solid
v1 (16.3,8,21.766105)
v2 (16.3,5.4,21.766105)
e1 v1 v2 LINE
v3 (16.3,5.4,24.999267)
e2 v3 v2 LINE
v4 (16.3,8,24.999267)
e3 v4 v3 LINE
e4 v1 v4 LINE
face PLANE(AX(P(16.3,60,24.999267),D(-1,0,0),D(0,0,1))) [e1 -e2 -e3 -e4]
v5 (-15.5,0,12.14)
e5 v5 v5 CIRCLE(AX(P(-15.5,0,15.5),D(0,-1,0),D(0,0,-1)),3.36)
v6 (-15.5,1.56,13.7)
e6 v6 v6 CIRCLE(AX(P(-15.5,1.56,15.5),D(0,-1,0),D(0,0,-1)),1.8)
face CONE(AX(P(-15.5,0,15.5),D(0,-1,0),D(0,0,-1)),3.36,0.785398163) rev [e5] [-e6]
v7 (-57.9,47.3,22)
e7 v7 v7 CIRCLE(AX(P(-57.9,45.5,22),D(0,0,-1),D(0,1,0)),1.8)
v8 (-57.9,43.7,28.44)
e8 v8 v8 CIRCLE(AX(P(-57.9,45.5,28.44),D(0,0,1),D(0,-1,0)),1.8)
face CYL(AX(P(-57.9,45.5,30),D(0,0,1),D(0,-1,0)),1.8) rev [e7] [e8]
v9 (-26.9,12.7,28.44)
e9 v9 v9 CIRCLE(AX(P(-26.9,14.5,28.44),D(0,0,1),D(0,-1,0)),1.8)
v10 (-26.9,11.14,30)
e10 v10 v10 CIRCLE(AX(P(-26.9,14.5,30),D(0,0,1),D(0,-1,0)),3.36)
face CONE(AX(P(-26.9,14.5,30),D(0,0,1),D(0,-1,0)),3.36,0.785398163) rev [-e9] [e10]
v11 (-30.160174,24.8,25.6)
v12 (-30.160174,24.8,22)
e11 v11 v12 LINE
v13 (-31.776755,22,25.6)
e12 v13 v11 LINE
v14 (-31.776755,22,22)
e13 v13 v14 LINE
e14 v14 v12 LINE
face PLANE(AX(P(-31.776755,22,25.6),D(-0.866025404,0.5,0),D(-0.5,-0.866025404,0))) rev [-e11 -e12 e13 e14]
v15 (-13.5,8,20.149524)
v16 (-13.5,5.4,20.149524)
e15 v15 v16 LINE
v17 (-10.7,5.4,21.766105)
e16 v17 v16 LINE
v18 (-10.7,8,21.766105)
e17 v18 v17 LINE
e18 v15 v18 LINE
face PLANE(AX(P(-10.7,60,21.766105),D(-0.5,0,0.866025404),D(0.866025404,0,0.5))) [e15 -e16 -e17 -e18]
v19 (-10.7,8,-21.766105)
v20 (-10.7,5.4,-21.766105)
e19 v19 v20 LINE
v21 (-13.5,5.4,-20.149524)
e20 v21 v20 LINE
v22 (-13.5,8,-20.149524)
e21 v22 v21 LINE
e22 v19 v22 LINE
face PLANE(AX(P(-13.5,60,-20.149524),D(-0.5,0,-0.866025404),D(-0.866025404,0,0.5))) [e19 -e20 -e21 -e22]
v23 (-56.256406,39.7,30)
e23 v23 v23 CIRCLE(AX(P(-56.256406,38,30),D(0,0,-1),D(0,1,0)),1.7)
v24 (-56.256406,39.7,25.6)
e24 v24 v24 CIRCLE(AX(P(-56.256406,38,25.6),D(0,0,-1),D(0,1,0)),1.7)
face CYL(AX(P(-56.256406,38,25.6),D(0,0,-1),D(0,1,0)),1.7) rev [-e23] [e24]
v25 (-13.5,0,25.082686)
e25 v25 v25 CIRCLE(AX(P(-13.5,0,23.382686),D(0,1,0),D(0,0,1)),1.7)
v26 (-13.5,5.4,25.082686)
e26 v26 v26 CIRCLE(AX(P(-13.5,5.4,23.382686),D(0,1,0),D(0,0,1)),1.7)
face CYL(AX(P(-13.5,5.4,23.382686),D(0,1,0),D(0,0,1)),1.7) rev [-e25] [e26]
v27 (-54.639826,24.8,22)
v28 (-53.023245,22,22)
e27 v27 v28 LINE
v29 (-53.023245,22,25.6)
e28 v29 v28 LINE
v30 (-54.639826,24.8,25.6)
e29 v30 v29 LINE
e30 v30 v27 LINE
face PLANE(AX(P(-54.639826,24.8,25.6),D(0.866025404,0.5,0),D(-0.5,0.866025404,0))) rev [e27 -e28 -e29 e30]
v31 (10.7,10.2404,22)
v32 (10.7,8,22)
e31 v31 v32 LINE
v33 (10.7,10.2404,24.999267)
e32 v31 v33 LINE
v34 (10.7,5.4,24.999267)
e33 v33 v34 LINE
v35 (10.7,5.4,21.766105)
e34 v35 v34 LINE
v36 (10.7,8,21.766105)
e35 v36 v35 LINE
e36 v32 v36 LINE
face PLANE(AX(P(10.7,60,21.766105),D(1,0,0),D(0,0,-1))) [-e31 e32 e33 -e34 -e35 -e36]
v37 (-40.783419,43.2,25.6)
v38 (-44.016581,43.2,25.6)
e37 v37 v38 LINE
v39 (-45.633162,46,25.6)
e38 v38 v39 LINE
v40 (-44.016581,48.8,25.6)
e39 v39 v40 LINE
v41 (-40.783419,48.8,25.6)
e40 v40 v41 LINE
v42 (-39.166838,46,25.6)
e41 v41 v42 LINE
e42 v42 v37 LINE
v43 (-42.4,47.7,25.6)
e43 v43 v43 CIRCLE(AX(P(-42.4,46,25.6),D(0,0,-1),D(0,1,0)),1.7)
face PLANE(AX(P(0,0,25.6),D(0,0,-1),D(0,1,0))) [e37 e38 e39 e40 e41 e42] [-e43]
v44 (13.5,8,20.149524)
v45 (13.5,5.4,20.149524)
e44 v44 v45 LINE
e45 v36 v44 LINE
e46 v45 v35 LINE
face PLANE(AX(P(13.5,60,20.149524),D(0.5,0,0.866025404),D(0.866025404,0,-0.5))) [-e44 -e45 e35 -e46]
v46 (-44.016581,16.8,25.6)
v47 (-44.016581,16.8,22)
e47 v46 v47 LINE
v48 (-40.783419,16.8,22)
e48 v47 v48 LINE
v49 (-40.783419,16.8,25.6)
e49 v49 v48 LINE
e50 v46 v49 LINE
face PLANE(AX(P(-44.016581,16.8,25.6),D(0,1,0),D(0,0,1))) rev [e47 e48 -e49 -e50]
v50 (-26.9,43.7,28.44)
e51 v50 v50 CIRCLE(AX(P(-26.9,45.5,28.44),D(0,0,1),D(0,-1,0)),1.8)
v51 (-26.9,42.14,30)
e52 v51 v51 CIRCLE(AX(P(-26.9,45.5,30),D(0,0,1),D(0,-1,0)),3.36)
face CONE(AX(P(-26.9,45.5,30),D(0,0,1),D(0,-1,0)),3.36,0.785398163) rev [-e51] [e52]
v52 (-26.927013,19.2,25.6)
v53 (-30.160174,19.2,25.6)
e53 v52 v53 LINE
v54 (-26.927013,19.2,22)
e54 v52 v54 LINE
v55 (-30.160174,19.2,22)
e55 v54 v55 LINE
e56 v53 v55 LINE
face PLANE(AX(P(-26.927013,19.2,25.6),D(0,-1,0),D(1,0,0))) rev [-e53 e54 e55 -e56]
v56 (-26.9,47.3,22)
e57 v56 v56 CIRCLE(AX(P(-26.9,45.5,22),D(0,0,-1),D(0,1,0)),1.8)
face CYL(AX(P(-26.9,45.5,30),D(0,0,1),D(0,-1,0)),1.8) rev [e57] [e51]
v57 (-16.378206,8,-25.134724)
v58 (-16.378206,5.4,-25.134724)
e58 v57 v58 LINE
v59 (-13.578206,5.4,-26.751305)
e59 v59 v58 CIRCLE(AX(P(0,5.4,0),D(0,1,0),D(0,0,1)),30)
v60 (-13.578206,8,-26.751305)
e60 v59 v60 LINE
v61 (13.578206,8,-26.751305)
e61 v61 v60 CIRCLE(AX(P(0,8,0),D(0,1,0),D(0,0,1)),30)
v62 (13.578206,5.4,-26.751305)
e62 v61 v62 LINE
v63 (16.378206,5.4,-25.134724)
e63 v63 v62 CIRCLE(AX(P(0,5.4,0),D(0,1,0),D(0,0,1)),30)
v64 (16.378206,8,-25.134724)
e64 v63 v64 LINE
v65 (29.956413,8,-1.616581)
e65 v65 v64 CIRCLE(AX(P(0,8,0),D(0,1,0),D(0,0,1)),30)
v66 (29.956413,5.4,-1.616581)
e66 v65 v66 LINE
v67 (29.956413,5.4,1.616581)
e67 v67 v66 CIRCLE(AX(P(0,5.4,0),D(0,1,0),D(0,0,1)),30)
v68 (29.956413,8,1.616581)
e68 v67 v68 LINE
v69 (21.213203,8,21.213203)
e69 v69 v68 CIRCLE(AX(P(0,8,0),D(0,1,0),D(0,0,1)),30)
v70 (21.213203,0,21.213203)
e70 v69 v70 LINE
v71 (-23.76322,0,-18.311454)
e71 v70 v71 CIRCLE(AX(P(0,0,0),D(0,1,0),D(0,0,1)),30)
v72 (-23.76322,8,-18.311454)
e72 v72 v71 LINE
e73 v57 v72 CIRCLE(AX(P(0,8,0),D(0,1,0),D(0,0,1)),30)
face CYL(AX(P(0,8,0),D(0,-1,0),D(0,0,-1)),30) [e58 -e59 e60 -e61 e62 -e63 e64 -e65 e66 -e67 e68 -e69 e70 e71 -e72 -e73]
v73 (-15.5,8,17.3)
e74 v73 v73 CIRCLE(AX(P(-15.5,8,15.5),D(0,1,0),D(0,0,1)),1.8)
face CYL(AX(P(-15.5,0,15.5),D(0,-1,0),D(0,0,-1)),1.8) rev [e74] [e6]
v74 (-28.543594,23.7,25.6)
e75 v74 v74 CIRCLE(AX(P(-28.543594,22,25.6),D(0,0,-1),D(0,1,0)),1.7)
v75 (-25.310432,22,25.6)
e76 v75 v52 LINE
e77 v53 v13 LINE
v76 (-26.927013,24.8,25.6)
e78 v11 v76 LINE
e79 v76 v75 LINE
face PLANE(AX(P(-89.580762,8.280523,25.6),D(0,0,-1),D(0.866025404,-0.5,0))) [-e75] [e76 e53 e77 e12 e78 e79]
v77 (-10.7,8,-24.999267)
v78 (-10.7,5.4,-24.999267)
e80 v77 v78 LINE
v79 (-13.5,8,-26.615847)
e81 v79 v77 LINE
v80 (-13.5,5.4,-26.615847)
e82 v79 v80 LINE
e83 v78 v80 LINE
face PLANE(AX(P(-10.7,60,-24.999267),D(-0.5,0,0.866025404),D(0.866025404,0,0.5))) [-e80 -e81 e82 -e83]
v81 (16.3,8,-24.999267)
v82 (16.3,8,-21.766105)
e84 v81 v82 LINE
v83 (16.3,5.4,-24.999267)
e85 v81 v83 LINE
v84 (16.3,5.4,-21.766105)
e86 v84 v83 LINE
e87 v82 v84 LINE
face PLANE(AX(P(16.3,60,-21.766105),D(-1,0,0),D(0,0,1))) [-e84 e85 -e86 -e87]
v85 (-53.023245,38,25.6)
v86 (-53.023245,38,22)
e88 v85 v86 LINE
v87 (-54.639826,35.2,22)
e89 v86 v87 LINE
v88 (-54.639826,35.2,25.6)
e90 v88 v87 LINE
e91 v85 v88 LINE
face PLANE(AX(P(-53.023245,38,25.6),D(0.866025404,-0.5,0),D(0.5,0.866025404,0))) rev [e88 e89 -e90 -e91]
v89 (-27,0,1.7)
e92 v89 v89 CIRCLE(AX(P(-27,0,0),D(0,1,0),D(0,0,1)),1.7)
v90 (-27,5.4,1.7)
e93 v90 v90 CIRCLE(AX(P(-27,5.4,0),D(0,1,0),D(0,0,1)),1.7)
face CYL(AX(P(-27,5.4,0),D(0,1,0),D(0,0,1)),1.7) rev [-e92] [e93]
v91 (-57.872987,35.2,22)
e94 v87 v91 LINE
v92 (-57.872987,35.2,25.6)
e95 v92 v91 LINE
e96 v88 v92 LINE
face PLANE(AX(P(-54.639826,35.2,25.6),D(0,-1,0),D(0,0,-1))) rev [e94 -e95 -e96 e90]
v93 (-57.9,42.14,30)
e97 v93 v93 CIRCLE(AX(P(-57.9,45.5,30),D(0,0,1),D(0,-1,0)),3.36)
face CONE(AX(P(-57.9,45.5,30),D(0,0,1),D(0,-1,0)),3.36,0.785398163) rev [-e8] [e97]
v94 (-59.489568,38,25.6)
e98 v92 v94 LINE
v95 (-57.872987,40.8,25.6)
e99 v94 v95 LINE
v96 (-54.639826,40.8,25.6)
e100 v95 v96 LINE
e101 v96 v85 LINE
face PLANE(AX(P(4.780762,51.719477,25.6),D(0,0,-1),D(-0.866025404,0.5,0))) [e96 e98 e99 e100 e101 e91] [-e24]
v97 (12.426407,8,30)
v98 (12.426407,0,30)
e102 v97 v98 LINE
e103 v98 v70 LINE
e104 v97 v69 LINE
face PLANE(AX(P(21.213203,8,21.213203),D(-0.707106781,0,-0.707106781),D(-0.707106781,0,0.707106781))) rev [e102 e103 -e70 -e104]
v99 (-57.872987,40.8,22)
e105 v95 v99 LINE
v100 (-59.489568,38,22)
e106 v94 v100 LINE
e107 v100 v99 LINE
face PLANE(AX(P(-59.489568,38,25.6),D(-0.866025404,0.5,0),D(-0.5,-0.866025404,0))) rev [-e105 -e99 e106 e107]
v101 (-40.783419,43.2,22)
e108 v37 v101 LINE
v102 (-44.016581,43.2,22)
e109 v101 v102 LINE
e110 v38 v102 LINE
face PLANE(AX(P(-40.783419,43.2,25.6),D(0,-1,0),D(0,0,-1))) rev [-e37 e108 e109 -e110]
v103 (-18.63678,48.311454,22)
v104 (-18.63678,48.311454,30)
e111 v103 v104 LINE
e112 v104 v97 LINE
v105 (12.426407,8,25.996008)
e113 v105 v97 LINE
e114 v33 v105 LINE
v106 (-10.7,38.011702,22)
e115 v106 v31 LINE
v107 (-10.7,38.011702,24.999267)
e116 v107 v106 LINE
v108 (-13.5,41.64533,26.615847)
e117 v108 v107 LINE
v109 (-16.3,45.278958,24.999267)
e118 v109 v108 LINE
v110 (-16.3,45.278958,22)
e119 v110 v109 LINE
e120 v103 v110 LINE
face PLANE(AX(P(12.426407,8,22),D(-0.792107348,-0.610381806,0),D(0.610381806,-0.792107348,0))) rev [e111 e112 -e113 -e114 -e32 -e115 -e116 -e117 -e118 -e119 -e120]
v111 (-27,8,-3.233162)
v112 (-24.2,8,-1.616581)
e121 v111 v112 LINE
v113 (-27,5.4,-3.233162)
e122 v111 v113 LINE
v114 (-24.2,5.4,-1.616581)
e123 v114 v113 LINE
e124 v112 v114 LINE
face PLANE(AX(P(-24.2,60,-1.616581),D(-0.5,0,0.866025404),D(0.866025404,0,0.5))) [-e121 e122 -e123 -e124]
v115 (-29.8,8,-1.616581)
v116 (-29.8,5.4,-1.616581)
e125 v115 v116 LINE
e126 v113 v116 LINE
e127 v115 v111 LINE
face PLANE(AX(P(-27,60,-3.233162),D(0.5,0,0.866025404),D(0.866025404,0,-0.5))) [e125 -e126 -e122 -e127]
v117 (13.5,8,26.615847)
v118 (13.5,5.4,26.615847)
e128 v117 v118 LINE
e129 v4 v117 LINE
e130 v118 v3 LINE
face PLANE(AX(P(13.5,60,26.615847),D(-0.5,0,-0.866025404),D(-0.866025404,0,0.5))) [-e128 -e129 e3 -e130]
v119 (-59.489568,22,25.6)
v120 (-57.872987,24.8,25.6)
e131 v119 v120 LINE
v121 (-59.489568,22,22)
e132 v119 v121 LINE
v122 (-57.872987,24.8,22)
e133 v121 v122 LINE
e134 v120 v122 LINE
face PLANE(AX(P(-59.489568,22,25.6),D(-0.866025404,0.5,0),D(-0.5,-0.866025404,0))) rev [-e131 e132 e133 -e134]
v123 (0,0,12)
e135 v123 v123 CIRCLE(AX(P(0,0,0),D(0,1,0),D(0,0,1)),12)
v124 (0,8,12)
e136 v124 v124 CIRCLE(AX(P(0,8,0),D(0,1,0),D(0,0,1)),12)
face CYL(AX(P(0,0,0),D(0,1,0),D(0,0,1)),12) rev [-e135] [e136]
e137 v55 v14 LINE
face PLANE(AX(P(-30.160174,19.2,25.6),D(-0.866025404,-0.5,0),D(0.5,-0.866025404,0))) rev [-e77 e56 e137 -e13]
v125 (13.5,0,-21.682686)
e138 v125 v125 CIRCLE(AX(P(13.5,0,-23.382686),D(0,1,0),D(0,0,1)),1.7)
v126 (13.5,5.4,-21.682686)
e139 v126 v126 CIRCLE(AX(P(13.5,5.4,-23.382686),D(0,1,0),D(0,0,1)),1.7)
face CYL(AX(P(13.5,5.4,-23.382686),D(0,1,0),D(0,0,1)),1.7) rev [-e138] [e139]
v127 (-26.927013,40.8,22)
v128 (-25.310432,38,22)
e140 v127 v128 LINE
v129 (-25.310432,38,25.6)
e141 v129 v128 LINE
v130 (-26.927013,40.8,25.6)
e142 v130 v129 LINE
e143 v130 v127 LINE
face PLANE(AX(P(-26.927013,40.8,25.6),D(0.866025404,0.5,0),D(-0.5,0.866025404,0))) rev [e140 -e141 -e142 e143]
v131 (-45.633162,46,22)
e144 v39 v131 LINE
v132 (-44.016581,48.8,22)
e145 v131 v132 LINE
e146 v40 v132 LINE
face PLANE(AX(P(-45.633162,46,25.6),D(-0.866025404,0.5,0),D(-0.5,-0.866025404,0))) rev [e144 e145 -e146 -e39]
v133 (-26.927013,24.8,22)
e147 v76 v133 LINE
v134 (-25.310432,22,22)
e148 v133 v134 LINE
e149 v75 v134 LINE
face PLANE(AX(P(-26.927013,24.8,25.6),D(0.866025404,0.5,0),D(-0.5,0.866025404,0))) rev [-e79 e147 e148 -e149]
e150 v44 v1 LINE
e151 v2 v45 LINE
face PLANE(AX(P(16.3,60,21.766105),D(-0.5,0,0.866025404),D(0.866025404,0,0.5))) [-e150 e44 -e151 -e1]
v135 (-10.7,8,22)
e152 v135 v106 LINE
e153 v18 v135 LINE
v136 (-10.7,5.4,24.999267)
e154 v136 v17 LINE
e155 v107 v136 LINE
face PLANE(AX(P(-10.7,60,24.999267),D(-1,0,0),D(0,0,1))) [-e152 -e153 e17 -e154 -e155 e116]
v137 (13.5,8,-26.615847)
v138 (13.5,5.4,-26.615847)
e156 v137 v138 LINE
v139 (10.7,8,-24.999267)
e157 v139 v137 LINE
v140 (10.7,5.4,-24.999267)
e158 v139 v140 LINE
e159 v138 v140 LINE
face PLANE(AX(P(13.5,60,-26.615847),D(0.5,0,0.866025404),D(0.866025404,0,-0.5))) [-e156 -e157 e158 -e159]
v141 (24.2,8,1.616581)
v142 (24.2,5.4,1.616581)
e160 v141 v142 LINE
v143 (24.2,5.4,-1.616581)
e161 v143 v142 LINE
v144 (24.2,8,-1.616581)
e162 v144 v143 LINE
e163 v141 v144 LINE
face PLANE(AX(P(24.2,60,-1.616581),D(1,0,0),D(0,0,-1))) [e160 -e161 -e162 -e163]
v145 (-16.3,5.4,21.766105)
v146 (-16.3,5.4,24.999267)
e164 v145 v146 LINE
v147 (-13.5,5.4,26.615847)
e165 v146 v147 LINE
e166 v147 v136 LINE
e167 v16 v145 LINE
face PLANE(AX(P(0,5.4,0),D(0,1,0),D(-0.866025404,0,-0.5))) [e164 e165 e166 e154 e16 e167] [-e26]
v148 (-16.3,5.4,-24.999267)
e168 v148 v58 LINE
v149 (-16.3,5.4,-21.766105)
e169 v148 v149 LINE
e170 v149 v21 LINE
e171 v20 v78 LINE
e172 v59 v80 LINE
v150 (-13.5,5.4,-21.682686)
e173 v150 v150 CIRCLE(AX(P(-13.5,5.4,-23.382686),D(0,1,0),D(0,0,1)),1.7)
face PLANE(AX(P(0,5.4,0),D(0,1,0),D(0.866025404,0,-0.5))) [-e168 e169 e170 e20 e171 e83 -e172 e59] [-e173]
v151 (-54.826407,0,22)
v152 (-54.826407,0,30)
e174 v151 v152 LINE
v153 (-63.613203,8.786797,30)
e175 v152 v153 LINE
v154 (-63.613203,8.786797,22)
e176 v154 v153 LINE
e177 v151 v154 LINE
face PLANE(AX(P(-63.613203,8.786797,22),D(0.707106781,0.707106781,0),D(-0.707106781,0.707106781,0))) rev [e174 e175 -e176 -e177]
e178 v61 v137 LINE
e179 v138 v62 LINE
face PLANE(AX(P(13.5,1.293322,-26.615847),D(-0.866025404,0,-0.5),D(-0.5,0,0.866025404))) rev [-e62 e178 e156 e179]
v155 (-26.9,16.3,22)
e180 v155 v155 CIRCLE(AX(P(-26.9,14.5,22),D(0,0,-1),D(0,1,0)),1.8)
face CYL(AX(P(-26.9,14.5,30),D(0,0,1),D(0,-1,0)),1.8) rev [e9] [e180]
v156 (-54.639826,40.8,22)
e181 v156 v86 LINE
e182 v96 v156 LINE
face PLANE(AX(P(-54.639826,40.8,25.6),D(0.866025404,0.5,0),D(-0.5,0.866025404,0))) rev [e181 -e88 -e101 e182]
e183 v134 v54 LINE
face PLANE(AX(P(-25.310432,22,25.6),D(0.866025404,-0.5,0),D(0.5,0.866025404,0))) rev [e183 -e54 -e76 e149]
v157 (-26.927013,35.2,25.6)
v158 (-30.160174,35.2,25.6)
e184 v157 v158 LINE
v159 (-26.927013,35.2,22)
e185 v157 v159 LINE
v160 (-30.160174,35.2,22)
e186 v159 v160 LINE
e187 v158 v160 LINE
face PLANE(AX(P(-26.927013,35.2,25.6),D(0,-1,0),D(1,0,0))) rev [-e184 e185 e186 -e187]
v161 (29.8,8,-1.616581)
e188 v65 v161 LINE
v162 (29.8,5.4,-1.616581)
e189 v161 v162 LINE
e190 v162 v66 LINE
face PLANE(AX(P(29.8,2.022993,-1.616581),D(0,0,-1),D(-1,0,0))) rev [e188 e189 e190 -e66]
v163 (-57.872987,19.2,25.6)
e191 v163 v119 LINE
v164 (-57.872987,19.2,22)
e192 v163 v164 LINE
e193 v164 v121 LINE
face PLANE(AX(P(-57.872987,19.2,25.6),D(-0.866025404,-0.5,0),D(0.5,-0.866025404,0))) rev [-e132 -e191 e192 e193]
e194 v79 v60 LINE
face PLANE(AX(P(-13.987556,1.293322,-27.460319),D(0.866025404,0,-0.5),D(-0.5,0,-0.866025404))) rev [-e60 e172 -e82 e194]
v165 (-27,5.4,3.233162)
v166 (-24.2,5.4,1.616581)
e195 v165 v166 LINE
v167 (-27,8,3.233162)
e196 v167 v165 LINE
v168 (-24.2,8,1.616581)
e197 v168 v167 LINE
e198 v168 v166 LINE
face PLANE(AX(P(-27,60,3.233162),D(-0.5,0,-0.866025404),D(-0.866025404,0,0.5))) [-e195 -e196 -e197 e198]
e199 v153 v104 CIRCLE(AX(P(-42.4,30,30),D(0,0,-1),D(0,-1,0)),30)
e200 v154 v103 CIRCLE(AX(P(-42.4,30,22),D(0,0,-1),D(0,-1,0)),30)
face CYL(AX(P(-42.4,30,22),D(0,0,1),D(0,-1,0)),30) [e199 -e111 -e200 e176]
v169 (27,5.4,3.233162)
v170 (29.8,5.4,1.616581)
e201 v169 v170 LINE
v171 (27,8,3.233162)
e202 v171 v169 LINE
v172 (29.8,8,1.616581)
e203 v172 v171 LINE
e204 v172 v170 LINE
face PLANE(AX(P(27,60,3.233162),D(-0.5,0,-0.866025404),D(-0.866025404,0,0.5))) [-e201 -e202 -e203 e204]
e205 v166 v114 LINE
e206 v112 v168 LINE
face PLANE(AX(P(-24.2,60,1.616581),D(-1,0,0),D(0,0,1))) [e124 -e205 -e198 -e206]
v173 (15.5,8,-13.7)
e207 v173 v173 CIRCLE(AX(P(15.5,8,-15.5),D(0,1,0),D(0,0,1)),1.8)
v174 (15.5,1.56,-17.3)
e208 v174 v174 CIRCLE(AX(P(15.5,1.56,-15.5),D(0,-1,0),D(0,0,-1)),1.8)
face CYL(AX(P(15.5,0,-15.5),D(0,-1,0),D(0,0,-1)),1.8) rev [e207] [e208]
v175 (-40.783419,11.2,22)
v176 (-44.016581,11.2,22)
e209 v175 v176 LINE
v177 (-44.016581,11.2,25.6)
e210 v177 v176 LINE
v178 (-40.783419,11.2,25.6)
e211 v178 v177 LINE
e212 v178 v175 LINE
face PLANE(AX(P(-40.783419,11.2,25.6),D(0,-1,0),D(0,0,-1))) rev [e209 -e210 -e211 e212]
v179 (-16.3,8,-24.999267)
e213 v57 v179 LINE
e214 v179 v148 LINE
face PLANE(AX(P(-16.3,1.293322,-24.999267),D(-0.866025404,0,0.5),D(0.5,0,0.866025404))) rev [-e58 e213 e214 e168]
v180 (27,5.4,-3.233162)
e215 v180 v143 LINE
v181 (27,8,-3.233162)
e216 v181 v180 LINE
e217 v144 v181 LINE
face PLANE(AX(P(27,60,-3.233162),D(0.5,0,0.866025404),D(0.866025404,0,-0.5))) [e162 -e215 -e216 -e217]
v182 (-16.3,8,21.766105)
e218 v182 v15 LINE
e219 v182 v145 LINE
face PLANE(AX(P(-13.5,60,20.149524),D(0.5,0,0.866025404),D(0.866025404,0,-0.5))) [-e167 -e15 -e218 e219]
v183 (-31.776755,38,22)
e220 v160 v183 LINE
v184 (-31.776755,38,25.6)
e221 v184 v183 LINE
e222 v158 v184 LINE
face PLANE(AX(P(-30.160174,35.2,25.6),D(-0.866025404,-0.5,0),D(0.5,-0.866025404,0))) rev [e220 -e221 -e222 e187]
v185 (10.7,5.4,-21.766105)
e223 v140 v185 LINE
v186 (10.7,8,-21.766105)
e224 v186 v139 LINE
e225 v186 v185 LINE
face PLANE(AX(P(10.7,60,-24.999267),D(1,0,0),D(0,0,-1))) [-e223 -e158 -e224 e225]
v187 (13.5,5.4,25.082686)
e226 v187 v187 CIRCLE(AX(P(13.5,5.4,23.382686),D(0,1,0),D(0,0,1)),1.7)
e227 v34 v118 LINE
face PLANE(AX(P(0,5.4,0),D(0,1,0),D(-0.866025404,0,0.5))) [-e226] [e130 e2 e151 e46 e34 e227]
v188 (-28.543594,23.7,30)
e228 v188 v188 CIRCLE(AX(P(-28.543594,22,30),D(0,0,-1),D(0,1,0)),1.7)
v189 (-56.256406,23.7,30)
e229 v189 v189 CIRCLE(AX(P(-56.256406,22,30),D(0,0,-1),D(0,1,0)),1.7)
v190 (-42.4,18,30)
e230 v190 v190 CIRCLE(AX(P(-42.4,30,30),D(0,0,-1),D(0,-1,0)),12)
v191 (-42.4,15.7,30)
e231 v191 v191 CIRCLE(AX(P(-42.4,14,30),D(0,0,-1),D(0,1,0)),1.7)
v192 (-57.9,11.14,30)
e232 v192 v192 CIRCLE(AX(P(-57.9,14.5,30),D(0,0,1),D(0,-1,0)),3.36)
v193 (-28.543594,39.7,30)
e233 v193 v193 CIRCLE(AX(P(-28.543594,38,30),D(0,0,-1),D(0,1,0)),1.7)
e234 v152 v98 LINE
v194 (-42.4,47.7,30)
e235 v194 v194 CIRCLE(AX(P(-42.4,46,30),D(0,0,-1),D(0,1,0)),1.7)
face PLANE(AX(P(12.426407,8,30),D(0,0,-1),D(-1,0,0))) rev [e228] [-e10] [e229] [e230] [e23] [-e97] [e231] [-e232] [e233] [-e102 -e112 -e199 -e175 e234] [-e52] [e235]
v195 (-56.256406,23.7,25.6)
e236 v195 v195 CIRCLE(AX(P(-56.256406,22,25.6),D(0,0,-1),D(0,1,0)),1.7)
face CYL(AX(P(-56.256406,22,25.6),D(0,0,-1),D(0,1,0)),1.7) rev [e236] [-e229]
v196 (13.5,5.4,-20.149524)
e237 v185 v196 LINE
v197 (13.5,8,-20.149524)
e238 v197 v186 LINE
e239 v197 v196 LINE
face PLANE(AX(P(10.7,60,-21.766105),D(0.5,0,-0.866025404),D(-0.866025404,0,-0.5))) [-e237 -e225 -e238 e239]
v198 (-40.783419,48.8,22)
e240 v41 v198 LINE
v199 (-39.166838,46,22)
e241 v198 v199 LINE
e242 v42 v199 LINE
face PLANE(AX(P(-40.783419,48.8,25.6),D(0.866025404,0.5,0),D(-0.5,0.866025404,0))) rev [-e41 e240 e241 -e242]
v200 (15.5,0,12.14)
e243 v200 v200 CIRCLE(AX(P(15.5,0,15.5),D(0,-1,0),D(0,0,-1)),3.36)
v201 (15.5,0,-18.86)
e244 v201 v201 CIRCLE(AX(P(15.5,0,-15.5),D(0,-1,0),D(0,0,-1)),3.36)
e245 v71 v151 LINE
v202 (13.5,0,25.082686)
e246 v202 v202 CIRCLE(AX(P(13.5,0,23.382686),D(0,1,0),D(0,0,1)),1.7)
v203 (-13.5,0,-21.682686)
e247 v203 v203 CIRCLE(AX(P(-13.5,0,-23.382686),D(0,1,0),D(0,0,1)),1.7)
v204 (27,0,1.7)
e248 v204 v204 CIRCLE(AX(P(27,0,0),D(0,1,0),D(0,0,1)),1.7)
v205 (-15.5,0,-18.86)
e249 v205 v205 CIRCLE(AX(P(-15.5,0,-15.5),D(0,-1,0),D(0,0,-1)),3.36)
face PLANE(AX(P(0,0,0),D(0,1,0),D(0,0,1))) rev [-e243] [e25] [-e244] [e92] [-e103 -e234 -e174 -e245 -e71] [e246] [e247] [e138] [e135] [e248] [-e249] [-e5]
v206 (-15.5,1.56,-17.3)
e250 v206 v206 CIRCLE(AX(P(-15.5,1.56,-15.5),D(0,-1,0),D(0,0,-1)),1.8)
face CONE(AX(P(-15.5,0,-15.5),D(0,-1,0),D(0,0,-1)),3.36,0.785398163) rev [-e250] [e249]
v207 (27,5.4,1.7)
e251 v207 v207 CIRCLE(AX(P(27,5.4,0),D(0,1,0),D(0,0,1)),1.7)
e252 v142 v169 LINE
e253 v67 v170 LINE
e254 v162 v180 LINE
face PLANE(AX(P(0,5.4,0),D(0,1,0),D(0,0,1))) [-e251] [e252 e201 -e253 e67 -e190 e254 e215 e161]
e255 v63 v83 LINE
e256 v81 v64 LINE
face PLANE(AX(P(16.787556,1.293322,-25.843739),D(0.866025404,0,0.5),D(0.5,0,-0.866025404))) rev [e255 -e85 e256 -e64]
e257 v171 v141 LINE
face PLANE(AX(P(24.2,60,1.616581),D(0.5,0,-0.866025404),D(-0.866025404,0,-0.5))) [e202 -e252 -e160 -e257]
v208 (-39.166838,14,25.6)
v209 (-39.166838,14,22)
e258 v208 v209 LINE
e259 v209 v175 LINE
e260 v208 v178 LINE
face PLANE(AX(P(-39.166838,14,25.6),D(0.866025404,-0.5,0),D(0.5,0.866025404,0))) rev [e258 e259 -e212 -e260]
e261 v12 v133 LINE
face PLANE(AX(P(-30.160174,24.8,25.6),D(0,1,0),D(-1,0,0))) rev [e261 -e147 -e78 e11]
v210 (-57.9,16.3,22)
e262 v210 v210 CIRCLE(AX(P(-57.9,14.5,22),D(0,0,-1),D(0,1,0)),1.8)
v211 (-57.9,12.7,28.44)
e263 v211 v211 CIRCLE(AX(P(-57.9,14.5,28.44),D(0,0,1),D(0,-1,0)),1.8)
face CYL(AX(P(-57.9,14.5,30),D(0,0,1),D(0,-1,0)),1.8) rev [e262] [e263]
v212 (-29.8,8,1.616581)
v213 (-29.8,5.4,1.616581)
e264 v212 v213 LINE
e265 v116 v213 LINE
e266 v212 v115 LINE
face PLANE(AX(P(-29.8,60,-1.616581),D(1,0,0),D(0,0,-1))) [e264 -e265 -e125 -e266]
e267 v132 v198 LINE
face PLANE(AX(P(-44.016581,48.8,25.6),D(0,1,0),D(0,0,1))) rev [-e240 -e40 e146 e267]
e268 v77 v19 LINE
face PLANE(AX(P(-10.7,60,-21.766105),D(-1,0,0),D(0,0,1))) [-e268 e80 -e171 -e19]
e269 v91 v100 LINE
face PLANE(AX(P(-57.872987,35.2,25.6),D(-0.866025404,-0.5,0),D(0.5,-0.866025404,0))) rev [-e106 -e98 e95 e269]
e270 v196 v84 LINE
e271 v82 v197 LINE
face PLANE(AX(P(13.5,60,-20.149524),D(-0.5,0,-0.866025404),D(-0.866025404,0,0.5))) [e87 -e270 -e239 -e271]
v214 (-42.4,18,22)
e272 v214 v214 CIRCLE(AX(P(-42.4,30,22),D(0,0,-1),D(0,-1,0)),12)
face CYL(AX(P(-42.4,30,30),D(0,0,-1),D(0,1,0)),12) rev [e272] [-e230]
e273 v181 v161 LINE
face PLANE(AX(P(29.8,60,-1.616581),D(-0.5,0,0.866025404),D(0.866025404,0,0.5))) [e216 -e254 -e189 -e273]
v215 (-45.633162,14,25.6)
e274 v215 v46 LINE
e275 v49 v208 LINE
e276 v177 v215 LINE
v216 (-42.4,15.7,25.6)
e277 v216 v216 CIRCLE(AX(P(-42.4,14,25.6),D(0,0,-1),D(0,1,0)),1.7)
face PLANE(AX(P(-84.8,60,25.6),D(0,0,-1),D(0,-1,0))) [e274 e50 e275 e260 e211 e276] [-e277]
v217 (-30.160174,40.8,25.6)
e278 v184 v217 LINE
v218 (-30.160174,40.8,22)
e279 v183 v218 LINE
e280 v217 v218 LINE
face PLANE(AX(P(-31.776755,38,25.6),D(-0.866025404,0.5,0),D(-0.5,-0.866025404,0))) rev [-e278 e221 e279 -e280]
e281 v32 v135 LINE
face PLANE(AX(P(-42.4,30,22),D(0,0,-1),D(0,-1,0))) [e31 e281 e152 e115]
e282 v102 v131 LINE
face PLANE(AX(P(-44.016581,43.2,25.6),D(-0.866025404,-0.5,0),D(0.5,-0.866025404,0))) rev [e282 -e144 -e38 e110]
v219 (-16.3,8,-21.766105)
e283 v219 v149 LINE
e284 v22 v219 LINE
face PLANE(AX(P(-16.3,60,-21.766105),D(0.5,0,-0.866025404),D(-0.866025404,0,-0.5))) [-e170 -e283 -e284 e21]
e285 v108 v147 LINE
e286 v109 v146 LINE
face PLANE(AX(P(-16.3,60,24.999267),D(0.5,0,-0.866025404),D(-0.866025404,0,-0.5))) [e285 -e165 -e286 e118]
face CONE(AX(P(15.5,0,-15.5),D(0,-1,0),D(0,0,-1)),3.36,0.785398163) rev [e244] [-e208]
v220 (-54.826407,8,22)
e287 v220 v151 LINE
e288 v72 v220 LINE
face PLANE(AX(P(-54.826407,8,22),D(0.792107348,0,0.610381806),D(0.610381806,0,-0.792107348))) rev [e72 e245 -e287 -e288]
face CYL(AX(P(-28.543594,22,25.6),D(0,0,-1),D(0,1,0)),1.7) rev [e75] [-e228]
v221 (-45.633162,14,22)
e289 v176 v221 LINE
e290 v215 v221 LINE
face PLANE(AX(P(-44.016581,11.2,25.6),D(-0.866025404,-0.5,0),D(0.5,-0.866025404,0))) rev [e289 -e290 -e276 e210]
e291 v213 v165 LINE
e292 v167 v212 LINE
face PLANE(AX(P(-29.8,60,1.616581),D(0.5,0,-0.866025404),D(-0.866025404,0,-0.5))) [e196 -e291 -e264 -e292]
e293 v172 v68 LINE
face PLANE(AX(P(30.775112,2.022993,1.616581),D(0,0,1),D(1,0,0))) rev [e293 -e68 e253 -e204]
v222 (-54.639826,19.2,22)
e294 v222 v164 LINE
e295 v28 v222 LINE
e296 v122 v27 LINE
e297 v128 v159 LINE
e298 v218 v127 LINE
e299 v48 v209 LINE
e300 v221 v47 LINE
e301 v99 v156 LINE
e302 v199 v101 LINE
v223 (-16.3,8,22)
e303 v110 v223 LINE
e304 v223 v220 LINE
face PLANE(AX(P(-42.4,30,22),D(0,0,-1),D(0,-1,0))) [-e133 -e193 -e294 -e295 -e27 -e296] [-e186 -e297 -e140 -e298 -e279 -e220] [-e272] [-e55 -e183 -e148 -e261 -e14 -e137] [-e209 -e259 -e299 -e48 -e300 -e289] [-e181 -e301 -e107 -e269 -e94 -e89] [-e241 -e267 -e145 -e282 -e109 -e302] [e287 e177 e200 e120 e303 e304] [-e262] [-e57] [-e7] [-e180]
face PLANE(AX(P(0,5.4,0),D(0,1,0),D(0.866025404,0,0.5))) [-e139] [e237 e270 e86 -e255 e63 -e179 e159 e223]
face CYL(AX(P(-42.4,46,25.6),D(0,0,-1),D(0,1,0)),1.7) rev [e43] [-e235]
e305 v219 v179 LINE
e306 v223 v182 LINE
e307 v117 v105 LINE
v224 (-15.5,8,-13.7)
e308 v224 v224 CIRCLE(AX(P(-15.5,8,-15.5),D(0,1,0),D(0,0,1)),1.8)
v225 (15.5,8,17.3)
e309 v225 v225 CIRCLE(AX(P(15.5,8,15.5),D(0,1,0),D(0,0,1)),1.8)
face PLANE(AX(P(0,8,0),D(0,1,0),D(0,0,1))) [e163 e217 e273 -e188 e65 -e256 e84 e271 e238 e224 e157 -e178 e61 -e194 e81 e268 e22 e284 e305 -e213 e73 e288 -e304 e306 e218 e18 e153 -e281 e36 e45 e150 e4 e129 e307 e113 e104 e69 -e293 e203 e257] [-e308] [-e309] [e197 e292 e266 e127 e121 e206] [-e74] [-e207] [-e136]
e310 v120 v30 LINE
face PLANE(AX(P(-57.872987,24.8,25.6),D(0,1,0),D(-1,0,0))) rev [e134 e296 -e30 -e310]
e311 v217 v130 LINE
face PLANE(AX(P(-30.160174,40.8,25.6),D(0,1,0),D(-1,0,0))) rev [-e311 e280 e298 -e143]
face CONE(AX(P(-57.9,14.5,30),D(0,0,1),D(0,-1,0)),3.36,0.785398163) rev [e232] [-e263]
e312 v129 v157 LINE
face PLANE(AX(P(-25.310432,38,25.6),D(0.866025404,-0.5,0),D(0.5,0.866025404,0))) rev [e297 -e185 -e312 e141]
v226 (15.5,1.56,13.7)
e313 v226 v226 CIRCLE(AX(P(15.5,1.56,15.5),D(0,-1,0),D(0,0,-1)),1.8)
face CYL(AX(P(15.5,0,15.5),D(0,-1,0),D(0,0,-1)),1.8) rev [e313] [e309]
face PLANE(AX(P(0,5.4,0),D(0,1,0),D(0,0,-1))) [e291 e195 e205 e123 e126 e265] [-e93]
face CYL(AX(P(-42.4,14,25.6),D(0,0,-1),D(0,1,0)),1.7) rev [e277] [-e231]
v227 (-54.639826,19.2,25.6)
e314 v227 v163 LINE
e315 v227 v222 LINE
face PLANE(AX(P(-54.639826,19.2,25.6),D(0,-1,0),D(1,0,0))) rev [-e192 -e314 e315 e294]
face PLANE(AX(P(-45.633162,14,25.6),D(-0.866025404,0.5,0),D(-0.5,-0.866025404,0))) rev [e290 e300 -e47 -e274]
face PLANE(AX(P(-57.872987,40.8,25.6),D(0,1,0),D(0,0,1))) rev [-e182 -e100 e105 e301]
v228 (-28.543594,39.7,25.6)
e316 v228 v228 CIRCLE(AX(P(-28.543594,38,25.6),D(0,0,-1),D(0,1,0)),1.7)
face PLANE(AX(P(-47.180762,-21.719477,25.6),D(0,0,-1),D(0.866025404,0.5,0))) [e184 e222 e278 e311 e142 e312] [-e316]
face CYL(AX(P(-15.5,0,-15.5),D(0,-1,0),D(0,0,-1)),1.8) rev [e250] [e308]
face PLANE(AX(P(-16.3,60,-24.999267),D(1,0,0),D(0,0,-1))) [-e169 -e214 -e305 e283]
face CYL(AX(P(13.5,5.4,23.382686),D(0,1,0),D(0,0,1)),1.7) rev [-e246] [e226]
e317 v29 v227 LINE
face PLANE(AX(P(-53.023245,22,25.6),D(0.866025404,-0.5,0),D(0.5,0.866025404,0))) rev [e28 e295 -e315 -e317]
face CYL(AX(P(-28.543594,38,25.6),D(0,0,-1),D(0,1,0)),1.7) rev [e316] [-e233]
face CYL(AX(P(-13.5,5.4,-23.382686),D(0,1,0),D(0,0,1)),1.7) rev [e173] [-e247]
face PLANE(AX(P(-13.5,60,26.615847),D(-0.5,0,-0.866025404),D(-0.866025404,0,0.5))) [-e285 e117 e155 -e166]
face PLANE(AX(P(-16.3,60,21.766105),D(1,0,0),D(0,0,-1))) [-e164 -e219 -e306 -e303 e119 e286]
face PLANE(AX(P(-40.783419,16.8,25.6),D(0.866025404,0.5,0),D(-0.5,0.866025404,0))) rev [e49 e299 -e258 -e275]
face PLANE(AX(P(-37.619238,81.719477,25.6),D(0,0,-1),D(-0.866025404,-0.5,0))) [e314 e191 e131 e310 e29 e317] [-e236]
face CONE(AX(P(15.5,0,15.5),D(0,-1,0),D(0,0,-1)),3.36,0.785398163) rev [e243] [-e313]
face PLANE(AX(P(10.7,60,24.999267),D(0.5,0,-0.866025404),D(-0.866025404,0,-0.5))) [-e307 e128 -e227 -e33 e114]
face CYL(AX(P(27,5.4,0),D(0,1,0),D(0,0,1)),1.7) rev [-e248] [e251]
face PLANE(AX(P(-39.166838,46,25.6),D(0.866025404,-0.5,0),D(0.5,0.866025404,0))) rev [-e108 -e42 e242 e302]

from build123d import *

# Parameters (mm, degrees)
BOSS_EXTRUDE1_DEPTH   = 8
CIRPATTERN1_COUNT     = 2
SKETCH3_R             = 12
CUT_EXTRUDE1_DEPTH    = 95.051900566
CUT_EXTRUDE2_START    = -2.6
CUT_EXTRUDE2_DEPTH    = 97.651900566
M3_CLEARANCE_HOLE1_D  = 3.4
CIRPATTERN2_COUNT     = 6
CIRPATTERN3_START     = 22
CIRPATTERN3_OUTLINE_R = 12
CIRPATTERN3_DEPTH     = 8
CUT_EXTRUDE3_DEPTH    = 3.6
M3_CLEARANCE_HOLE2_D  = 3.4
CIRPATTERN4_COUNT     = 6
SKETCH15_W            = 0.975112204
SKETCH15_H            = 3.233161508
CUT_EXTRUDE4_DEPTH    = 2.6
CIRPATTERN5_COUNT     = 3
CIRPATTERN5_ANGLE     = 120


# Read off the part's stored shape, not the designer's step: CSK for M3 Hex Socket Countersunk Cap Screw1, CirPattern3
with BuildPart() as part:
    # Sketch1 → Boss-Extrude1 (new body)
    with BuildSketch(Plane(origin=(0, 0, 0), x_dir=(1, 0, 0), z_dir=(0, 1, 0))):
        with BuildLine():
            Line((21.213203436, -21.213203436), (12.426406871, -30))
            Line((12.426406871, -30), (-54.826406871, -30))
            Line((-54.826406871, -30), (-54.826406871, -22))
            Line((-54.826406871, -22), (-23.763220436, 18.311454189))
            ThreePointArc((-23.763220436, 18.311454189), (19.803416038, 22.534966457), (21.213203436, -21.213203436))
        make_face()
    boss_extrude1 = extrude(amount=BOSS_EXTRUDE1_DEPTH)

    # CirPattern1: Boss-Extrude1 ×2 about axis
    cirpattern1_axis = Axis((-21.2, 15, 15), (0, 0.7071067811865476, -0.7071067811865476))
    for i in range(1, CIRPATTERN1_COUNT):
        add(boss_extrude1.rotate(cirpattern1_axis, i * 360 / CIRPATTERN1_COUNT))

    # Sketch3 → Cut-Extrude1 (cut, through all)
    with BuildSketch(Plane(origin=(0, 8, 0), x_dir=(1, 0, 0), z_dir=(0, 1, 0))):
        with Locations(Location((0, 0, 0), (0, 0, 270))):
            Circle(SKETCH3_R)
    extrude(amount=-CUT_EXTRUDE1_DEPTH, mode=Mode.SUBTRACT)

    # Sketch4 → Cut-Extrude2 (cut)
    with BuildSketch(Plane(origin=(0, 8, 0), x_dir=(1, 0, 0), z_dir=(0, 1, 0)).offset(CUT_EXTRUDE2_START)):
        Polygon((27, 3.233161507), (24.2, 1.616580754), (24.2, -1.616580754), (27, -3.233161507), (29.8, -1.616580754), (29.8, 1.616580754), align=None)
    cut_extrude2 = extrude(amount=CUT_EXTRUDE2_DEPTH, mode=Mode.SUBTRACT)

    # M3 Clearance Hole1 (through all)
    with Locations(Plane(origin=(0, 5.4, 0), x_dir=(1, 0, 0), z_dir=(0, 1, 0))):
        with Locations((27, 0)):
            m3_clearance_hole1 = Hole(M3_CLEARANCE_HOLE1_D / 2)

    # CirPattern2: Cut-Extrude2, M3 Clearance Hole1 ×6 about axis
    cirpattern2_axis = Axis((0, 0, 0), (0, 1, 0))
    add([cut_extrude2.rotate(cirpattern2_axis, i * 360 / CIRPATTERN2_COUNT) for i in range(1, CIRPATTERN2_COUNT)], mode=Mode.SUBTRACT)
    add([m3_clearance_hole1.rotate(cirpattern2_axis, i * 360 / CIRPATTERN2_COUNT) for i in range(1, CIRPATTERN2_COUNT)], mode=Mode.SUBTRACT)

    # CSK for M3 Hex Socket Countersunk Ca 2 → CSK for M3 Hex Socket Countersunk Cap Screw1 (revolve, cut)
    with BuildSketch(Plane(origin=(-15.5, 0, -15.5), x_dir=(1, 0, 0), z_dir=(0, 0, 1))):
        Polygon((1.8, 1.56), (1.8, 8), (0, 8), (0, 0), (3.36, 0), align=None)
    revolve(axis=Axis((-15.5, 0, -15.5), (0, 1, 0)), mode=Mode.SUBTRACT)

    # CSK for M3 Hex Socket Countersunk Ca 3 o → CSK for M3 Hex Socket Countersunk Ca 3 (revolve, cut)
    with BuildSketch(Plane(origin=(15.5, 0, 15.5), x_dir=(1, 0, 0), z_dir=(0, 0, 1))):
        Polygon((1.8, 1.56), (1.8, 8), (0, 8), (0, 0), (3.36, 0), align=None)
    revolve(axis=Axis((15.5, 0, 15.5), (0, 1, 0)), mode=Mode.SUBTRACT)

    # CSK for M3 Hex Socket Countersunk Ca 4 o → CSK for M3 Hex Socket Countersunk Ca 4 (revolve, cut)
    with BuildSketch(Plane(origin=(-15.5, 0, 15.5), x_dir=(1, 0, 0), z_dir=(0, 0, 1))):
        Polygon((1.8, 1.56), (1.8, 8), (0, 8), (0, 0), (3.36, 0), align=None)
    revolve(axis=Axis((-15.5, 0, 15.5), (0, 1, 0)), mode=Mode.SUBTRACT)

    # CSK for M3 Hex Socket Countersunk Ca 5 o → CSK for M3 Hex Socket Countersunk Ca 5 (revolve, cut)
    with BuildSketch(Plane(origin=(15.5, 0, -15.5), x_dir=(1, 0, 0), z_dir=(0, 0, 1))):
        Polygon((1.8, 1.56), (1.8, 8), (0, 8), (0, 0), (3.36, 0), align=None)
    revolve(axis=Axis((15.5, 0, -15.5), (0, 1, 0)), mode=Mode.SUBTRACT)

    # CirPattern3 outline → CirPattern3 (cut)
    with BuildSketch(Plane.XY.offset(CIRPATTERN3_START)):
        with Locations((-42.4, 30)):
            Circle(CIRPATTERN3_OUTLINE_R)
    extrude(amount=CIRPATTERN3_DEPTH, mode=Mode.SUBTRACT)

    # CirPattern3 2 outline → CirPattern3 2 (revolve, cut)
    with BuildSketch(Plane(origin=(-26.9, 45.5, 0), x_dir=(1, 0, 0), z_dir=(0, -1, 0))):
        Polygon((0, 22), (1.8, 22), (1.8, 28.44), (3.36, 30), (0, 30), align=None)
    revolve(axis=Axis((-26.9, 45.5, 0), (0, 0, 1)), mode=Mode.SUBTRACT)

    # CirPattern3 3 outline → CirPattern3 3 (revolve, cut)
    with BuildSketch(Plane(origin=(-57.9, 14.5, 0), x_dir=(1, 0, 0), z_dir=(0, -1, 0))):
        Polygon((0, 22), (1.8, 22), (1.8, 28.44), (3.36, 30), (0, 30), align=None)
    revolve(axis=Axis((-57.9, 14.5, 0), (0, 0, 1)), mode=Mode.SUBTRACT)

    # CirPattern3 4 outline → CirPattern3 4 (revolve, cut)
    with BuildSketch(Plane(origin=(-26.9, 14.5, 0), x_dir=(1, 0, 0), z_dir=(0, -1, 0))):
        Polygon((0, 22), (1.8, 22), (1.8, 28.44), (3.36, 30), (0, 30), align=None)
    revolve(axis=Axis((-26.9, 14.5, 0), (0, 0, 1)), mode=Mode.SUBTRACT)

    # CirPattern3 5 outline → CirPattern3 5 (revolve, cut)
    with BuildSketch(Plane(origin=(-57.9, 45.5, 0), x_dir=(1, 0, 0), z_dir=(0, -1, 0))):
        Polygon((0, 22), (1.8, 22), (1.8, 28.44), (3.36, 30), (0, 30), align=None)
    revolve(axis=Axis((-57.9, 45.5, 0), (0, 0, 1)), mode=Mode.SUBTRACT)

    # Sketch11 → Cut-Extrude3 (cut)
    with BuildSketch(Plane(origin=(0, 0, 22), x_dir=(-1, 0, 0), z_dir=(0, 0, -1))):
        Polygon((45.633161507, 46), (44.016580754, 48.8), (40.783419246, 48.8), (39.166838493, 46), (40.783419246, 43.2), (44.016580754, 43.2), align=None)
    cut_extrude3 = extrude(amount=-CUT_EXTRUDE3_DEPTH, mode=Mode.SUBTRACT)

    # M3 Clearance Hole2 (through all)
    with Locations(Plane(origin=(0, 0, 25.6), x_dir=(-1, 0, 0), z_dir=(0, 0, -1))):
        with Locations((42.4, 46)):
            m3_clearance_hole2 = Hole(M3_CLEARANCE_HOLE2_D / 2)

    # CirPattern4: Cut-Extrude3, M3 Clearance Hole2 ×6 about axis
    cirpattern4_axis = Axis((-42.4, 30, 0), (0, 0, 1))
    add([cut_extrude3.rotate(cirpattern4_axis, i * 360 / CIRPATTERN4_COUNT) for i in range(1, CIRPATTERN4_COUNT)], mode=Mode.SUBTRACT)
    add([m3_clearance_hole2.rotate(cirpattern4_axis, i * 360 / CIRPATTERN4_COUNT) for i in range(1, CIRPATTERN4_COUNT)], mode=Mode.SUBTRACT)

    # Sketch15 → Cut-Extrude4 (cut)
    with BuildSketch(Plane(origin=(0, 8, 0), x_dir=(1, 0, 0), z_dir=(0, 1, 0))):
        with Locations((30.287556102, 0)):
            Rectangle(SKETCH15_W, SKETCH15_H)
    cut_extrude4 = extrude(amount=-CUT_EXTRUDE4_DEPTH, mode=Mode.SUBTRACT)

    # CirPattern5: Cut-Extrude4 ×3 about axis
    cirpattern5_axis = Axis((0, 0, 0), (0, 1, 0))
    for i in range(1, CIRPATTERN5_COUNT):
        add(cut_extrude4.rotate(cirpattern5_axis, i * CIRPATTERN5_ANGLE / (CIRPATTERN5_COUNT - 1)), mode=Mode.SUBTRACT)


solid = part.part
